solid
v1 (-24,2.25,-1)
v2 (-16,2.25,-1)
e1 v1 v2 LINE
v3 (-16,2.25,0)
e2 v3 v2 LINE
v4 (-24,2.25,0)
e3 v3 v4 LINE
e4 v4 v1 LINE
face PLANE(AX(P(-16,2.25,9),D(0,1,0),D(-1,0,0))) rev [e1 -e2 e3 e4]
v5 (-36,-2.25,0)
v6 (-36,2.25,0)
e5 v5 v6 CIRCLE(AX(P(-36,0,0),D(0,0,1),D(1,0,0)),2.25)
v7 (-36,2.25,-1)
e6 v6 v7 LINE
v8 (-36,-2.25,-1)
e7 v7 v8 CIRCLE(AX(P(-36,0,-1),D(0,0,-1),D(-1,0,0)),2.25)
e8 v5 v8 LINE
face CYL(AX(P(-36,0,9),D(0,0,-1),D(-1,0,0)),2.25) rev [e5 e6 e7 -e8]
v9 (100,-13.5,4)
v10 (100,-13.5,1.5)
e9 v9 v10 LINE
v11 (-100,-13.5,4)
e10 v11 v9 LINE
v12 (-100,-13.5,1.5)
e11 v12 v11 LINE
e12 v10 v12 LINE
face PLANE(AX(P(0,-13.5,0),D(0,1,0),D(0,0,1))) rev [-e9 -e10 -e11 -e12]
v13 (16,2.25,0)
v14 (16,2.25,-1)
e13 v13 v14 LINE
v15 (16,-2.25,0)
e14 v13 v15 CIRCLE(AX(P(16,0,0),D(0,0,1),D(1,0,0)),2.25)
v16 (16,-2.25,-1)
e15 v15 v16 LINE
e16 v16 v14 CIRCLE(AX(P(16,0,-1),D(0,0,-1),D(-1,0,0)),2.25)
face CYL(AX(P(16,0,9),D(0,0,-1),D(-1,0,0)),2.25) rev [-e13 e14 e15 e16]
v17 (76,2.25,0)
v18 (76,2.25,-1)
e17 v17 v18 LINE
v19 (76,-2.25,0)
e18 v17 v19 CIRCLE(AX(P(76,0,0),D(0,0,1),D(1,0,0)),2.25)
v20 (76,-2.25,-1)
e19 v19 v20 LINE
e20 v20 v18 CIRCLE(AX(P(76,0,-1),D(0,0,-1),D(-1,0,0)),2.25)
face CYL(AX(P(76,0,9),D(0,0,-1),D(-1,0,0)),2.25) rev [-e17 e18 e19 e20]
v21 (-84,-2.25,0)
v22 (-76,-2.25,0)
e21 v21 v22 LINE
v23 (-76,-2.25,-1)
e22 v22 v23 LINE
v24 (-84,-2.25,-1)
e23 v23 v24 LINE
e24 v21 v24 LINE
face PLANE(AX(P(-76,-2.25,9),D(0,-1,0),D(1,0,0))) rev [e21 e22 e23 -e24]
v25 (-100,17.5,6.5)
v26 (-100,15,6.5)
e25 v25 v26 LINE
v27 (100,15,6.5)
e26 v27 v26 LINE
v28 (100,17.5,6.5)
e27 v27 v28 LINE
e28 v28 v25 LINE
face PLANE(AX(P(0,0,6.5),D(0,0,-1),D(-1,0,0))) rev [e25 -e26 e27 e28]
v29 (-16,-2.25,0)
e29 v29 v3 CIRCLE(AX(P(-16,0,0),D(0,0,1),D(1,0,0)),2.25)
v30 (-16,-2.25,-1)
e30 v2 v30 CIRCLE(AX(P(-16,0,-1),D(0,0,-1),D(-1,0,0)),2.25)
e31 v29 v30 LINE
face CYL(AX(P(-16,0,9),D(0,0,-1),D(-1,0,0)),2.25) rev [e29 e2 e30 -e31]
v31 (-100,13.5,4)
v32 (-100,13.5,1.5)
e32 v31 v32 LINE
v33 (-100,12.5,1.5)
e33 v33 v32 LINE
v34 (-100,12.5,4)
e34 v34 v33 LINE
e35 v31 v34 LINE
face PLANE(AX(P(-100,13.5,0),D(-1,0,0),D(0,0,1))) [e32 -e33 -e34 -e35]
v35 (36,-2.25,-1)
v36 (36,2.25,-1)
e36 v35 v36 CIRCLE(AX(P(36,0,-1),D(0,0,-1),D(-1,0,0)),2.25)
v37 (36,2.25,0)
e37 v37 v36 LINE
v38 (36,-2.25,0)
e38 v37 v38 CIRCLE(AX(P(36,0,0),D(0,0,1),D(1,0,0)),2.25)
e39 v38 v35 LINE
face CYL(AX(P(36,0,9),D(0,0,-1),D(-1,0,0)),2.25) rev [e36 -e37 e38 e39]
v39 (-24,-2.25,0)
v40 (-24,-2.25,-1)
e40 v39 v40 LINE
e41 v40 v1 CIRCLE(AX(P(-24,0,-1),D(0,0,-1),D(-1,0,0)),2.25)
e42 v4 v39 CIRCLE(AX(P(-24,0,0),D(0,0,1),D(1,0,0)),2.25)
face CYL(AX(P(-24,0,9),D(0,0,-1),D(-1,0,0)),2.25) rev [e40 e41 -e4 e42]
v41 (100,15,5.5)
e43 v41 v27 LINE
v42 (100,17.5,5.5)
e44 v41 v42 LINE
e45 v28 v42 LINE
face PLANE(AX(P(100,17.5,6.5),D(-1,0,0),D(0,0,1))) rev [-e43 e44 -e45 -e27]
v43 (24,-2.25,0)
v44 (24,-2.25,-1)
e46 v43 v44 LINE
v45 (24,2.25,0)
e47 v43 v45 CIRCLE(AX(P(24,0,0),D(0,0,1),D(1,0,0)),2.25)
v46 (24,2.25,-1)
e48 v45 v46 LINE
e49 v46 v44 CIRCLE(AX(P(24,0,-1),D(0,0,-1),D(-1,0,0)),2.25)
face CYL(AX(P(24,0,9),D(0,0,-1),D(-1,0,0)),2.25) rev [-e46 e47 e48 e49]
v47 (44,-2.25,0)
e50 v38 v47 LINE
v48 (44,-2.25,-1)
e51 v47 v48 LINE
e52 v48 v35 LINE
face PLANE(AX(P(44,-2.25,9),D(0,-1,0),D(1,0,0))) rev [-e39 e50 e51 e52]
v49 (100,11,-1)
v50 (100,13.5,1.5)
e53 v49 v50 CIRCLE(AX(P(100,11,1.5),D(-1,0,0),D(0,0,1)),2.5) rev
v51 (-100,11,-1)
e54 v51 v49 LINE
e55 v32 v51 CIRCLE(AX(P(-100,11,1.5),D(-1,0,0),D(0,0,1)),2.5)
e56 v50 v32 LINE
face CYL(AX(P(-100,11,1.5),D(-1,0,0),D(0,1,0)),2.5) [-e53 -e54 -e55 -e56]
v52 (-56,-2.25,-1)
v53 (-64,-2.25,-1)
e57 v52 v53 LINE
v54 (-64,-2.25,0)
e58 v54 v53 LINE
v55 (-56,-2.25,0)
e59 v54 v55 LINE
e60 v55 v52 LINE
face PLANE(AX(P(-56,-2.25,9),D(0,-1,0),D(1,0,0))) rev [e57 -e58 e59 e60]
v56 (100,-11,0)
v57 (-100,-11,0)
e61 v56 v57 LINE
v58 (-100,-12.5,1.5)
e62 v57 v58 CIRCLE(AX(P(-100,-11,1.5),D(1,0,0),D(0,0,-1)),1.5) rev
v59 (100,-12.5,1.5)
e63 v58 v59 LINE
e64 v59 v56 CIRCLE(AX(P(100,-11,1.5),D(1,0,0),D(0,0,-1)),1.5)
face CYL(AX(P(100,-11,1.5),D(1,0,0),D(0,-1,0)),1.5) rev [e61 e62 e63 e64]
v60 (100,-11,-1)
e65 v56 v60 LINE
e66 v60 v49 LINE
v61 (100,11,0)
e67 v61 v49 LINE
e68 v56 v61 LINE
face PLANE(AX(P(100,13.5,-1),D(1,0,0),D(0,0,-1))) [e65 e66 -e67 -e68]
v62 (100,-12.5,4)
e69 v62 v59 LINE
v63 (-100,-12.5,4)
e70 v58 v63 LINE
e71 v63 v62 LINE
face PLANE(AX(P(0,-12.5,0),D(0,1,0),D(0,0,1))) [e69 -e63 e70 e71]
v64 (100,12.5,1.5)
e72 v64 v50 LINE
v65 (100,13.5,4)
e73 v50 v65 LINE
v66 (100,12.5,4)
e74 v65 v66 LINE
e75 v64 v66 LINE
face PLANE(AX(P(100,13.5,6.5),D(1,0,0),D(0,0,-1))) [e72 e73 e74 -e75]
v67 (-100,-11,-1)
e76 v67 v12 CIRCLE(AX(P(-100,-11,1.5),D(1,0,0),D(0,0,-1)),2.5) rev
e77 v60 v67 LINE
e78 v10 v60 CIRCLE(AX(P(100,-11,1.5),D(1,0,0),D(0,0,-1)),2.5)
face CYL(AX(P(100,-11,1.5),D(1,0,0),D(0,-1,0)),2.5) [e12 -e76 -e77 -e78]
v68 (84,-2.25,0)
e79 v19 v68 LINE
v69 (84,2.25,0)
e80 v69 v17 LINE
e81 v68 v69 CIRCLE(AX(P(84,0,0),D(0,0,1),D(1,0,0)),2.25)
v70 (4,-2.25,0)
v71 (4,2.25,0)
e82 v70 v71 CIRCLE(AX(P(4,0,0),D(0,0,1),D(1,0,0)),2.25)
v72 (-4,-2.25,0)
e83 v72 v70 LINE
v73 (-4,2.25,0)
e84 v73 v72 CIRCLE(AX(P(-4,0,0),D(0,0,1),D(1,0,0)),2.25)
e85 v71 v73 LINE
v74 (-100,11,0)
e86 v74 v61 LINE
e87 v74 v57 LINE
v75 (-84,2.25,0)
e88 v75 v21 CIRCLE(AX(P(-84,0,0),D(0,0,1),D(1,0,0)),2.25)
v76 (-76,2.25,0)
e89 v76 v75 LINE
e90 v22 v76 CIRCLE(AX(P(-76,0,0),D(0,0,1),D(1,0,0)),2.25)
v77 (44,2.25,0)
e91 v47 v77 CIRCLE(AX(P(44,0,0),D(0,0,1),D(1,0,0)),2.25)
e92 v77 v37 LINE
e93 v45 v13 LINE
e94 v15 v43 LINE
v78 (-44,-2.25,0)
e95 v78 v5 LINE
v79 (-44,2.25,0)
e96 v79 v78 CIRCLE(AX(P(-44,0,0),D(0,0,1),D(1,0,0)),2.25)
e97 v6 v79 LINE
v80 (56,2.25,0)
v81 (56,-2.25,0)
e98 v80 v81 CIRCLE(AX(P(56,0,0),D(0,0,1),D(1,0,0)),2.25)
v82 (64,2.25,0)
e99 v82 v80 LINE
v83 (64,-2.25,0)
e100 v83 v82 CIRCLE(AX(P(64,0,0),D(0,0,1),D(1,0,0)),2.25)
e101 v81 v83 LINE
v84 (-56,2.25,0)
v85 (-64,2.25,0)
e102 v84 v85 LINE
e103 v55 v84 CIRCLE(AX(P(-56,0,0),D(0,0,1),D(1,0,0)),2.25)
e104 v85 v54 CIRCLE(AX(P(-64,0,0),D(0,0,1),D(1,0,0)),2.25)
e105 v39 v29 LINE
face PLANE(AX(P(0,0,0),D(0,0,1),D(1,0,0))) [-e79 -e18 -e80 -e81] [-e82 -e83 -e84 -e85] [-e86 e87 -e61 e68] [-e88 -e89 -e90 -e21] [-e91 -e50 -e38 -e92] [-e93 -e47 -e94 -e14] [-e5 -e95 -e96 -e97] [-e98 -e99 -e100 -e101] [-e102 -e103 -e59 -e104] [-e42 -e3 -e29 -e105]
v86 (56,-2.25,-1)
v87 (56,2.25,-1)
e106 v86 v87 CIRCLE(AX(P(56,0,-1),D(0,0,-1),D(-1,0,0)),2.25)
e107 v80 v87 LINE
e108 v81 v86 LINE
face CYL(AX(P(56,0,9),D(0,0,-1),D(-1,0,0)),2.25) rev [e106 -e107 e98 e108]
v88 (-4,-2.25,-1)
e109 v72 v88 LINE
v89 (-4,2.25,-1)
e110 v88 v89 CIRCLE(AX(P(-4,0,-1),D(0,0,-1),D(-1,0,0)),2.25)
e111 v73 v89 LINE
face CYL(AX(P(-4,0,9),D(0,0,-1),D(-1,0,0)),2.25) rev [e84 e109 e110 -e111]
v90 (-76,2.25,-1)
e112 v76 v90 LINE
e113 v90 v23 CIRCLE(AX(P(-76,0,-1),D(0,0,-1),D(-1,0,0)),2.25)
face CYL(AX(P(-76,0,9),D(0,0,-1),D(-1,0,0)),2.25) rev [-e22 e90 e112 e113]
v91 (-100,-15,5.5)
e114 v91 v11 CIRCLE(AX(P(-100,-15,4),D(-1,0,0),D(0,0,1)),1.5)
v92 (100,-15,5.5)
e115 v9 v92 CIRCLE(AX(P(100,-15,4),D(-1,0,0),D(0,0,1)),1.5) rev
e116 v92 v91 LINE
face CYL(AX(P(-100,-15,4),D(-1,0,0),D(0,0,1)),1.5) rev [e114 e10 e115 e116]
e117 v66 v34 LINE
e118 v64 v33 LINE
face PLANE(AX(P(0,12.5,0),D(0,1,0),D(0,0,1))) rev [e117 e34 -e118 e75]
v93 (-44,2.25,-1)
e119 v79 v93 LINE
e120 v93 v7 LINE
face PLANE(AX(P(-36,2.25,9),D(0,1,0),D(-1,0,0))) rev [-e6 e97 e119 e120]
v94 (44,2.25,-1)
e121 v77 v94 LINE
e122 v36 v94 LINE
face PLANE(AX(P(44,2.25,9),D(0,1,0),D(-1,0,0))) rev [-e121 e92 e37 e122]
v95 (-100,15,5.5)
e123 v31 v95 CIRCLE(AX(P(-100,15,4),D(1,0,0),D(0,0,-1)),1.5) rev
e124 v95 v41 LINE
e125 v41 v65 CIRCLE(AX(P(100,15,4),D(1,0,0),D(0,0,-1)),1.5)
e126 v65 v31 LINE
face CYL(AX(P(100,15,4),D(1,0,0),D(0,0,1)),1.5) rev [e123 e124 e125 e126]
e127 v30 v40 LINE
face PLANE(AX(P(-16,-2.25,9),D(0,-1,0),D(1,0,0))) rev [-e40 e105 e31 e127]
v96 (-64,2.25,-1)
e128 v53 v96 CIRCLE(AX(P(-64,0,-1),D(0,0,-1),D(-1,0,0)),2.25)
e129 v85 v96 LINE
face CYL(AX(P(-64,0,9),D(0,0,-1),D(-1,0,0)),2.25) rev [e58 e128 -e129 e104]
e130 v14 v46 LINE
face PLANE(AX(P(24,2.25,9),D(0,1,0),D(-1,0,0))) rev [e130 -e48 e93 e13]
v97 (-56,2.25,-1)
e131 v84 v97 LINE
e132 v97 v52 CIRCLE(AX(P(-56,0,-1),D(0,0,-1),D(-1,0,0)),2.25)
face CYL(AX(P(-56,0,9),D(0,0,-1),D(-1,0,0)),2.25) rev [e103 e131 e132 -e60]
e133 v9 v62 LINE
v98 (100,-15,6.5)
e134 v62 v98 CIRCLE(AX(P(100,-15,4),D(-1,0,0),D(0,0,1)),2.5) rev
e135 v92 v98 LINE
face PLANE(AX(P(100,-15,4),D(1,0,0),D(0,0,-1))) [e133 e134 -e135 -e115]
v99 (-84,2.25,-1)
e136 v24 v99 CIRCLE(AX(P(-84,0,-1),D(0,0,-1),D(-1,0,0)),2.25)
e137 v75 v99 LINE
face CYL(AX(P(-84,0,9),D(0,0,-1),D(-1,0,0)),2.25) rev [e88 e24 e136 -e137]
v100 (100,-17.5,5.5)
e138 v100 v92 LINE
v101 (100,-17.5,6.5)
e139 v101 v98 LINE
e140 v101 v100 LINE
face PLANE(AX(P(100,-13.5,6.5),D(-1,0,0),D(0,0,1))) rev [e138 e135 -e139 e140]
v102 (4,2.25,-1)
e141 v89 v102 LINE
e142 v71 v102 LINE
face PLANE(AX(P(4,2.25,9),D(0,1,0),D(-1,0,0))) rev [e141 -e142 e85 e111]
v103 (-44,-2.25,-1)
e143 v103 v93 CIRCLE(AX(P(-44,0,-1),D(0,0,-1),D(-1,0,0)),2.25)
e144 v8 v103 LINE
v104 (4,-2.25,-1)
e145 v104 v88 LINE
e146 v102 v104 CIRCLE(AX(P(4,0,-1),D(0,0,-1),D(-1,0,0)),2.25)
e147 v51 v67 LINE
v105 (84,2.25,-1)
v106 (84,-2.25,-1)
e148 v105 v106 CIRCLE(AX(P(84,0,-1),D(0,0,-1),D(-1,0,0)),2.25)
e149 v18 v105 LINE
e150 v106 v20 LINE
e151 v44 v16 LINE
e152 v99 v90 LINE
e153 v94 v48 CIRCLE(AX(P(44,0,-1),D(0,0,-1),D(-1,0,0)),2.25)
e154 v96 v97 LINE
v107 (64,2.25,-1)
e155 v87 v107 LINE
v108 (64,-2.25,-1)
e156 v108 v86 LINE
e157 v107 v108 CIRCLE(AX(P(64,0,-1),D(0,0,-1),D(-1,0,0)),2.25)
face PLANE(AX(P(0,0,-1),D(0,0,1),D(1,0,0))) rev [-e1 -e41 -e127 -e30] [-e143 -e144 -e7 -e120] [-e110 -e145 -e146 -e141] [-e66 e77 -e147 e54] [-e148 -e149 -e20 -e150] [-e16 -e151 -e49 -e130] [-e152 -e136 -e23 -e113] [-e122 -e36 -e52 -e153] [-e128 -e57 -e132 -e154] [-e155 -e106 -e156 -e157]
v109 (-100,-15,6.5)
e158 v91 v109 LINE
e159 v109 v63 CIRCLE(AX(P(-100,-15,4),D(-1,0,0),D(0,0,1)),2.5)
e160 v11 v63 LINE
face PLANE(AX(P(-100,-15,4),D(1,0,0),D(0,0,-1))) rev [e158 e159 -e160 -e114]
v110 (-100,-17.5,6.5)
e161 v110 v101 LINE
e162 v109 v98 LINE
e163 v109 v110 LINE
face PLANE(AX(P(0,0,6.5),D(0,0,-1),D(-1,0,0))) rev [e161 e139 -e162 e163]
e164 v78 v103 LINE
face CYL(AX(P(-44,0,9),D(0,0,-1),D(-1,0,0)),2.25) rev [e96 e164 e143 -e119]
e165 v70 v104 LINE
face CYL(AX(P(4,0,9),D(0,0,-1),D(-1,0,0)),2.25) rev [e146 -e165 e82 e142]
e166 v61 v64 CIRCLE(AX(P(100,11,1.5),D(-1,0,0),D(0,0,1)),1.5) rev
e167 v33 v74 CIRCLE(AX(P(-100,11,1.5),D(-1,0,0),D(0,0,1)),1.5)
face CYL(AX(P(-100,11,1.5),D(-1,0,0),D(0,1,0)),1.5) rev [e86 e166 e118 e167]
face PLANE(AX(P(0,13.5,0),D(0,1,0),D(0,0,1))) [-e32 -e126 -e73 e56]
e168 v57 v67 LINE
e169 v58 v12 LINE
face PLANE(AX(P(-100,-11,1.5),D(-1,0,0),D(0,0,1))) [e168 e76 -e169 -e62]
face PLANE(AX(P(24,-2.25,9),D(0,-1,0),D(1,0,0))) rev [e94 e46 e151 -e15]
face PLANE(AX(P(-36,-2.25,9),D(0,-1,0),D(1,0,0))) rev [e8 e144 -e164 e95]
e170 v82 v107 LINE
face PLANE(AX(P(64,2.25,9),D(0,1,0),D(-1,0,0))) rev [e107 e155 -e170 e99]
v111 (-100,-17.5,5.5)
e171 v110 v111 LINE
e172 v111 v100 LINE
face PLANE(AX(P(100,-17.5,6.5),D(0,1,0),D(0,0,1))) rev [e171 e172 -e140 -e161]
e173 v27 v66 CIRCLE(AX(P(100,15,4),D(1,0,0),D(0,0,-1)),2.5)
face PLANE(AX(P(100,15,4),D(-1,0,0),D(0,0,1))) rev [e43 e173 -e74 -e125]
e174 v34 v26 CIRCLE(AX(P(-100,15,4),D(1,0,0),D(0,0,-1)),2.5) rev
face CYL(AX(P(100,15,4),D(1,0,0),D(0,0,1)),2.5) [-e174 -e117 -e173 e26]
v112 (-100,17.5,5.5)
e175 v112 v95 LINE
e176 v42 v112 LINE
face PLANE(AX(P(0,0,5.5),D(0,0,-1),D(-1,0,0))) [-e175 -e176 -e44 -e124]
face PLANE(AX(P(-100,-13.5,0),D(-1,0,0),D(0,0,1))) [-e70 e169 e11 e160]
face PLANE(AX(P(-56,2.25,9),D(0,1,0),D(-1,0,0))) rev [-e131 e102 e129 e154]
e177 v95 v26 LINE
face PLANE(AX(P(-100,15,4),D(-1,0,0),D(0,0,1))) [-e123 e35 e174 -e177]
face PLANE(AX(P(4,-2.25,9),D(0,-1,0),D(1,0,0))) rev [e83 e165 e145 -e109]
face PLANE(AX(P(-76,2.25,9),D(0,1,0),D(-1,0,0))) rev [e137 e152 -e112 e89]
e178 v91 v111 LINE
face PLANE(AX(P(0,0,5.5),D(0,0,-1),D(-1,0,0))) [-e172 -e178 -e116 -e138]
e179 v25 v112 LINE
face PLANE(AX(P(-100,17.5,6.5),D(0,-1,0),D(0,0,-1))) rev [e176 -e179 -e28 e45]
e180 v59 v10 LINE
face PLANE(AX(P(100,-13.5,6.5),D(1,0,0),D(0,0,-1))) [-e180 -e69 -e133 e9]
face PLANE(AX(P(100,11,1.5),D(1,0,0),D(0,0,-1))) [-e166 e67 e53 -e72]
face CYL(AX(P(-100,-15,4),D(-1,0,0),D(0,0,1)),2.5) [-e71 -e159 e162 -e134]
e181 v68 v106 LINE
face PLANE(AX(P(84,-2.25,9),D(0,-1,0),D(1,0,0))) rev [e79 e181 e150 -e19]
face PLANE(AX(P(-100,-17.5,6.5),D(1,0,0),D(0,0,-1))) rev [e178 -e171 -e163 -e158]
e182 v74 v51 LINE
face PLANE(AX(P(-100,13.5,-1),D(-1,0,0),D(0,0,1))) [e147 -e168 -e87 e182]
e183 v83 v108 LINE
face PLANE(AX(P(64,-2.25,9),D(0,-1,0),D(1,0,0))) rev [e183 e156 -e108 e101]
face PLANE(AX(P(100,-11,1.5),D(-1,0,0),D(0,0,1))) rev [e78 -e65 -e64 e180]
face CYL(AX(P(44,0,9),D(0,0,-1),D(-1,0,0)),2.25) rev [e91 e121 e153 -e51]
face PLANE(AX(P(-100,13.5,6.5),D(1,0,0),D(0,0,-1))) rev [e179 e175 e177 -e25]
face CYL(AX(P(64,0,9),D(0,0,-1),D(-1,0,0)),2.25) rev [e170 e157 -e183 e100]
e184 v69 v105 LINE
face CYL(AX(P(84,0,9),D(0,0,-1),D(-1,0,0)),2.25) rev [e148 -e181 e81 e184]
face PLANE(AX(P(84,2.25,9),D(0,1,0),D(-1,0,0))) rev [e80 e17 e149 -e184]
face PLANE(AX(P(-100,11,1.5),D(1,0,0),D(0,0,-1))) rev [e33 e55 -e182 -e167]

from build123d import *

# Parameters (mm, degrees)
SKETCH_1_W                         = 200
SKETCH_1_H                         = 27
SM_BASE_FLANGE_1_DEPTH             = 1
SM_EDGE_FLANGE_1_STRIP_W           = 7
SM_EDGE_FLANGE_1_STRIP_H           = 1
SM_EDGE_FLANGE_1_STRIP_CUT_DEPTH   = 200
SM_EDGE_FLANGE_1_STRIP_2_W         = 7
SM_EDGE_FLANGE_1_STRIP_2_H         = 1
SM_EDGE_FLANGE_1_STRIP_CUT_2_DEPTH = 200
SM_EDGE_FLANGE_1_DEPTH             = 200
SM_EDGE_FLANGE_1_BEND_DEPTH        = 200
SM_EDGE_FLANGE_2_STRIP_W           = 7
SM_EDGE_FLANGE_2_STRIP_H           = 1
SM_EDGE_FLANGE_2_STRIP_CUT_DEPTH   = 200
SM_EDGE_FLANGE_2_STRIP_2_W         = 7
SM_EDGE_FLANGE_2_STRIP_2_H         = 1
SM_EDGE_FLANGE_2_STRIP_CUT_2_DEPTH = 200
SM_EDGE_FLANGE_2_DEPTH             = 200
SM_EDGE_FLANGE_2_BEND_DEPTH        = 200
CUT_EXTRUDE_1_DEPTH                = 10
PATTERN_LINEAR_1_COUNT             = 5
PATTERN_LINEAR_1_PITCH             = 20
PATTERN_LINEAR_1_COL_COUNT         = 5
PATTERN_LINEAR_1_COL_PITCH         = 20


# Sheet-metal steps are written as plain solids
with BuildPart() as part:
    # Sketch 1 → 基体-法兰1 (new body)
    with BuildSketch(Plane.XY):
        Rectangle(SKETCH_1_W, SKETCH_1_H)
    extrude(amount=-SM_BASE_FLANGE_1_DEPTH)

    # 边线-法兰1 strip (across the edge) → 边线-法兰1 strip cut (cut)
    with BuildSketch(Plane(origin=(100, 13.5, 0), x_dir=(0, -1, 0), z_dir=(-1, 0, 0))):
        with Locations((-1, -0.5)):
            Rectangle(SM_EDGE_FLANGE_1_STRIP_W, SM_EDGE_FLANGE_1_STRIP_H)
    extrude(amount=SM_EDGE_FLANGE_1_STRIP_CUT_DEPTH, mode=Mode.SUBTRACT)

    # 边线-法兰1 strip 2 (across the edge) → 边线-法兰1 strip cut 2 (cut)
    with BuildSketch(Plane(origin=(-100, -13.5, 0), x_dir=(0, 1, 0), z_dir=(1, 0, 0))):
        with Locations((-1, -0.5)):
            Rectangle(SM_EDGE_FLANGE_1_STRIP_2_W, SM_EDGE_FLANGE_1_STRIP_2_H)
    extrude(amount=SM_EDGE_FLANGE_1_STRIP_CUT_2_DEPTH, mode=Mode.SUBTRACT)

    # 边线-法兰1 section (across the edge) → 边线-法兰1 (add)
    with BuildSketch(Plane(origin=(100, 13.5, 0), x_dir=(0, -1, 0), z_dir=(-1, 0, 0))):
        with BuildLine():
            Line((0, 1.5), (0, 6.5))
            Line((0, 6.5), (1, 6.5))
            Line((1, 6.5), (1, 1.5))
            ThreePointArc((1, 1.5), (1.439339828, 0.439339828), (2.5, 0))
            Line((2.5, 0), (2.5, -1))
            ThreePointArc((2.5, -1), (0.732233047, -0.267766953), (0, 1.5))
        make_face()
    extrude(amount=SM_EDGE_FLANGE_1_DEPTH)

    # 边线-法兰1 section 2 (across the edge) → 边线-法兰1 bend (add)
    with BuildSketch(Plane(origin=(-100, -13.5, 0), x_dir=(0, 1, 0), z_dir=(1, 0, 0))):
        with BuildLine():
            Line((0, 1.5), (0, 6.5))
            Line((0, 6.5), (1, 6.5))
            Line((1, 6.5), (1, 1.5))
            ThreePointArc((1, 1.5), (1.439339828, 0.439339828), (2.5, 0))
            Line((2.5, 0), (2.5, -1))
            ThreePointArc((2.5, -1), (0.732233047, -0.267766953), (0, 1.5))
        make_face()
    extrude(amount=SM_EDGE_FLANGE_1_BEND_DEPTH)

    # 边线-法兰2 strip (across the edge) → 边线-法兰2 strip cut (cut)
    with BuildSketch(Plane(origin=(-100, 13.5, 6.5), x_dir=(0, 0, -1), z_dir=(1, 0, 0))):
        with Locations((-1, -0.5)):
            Rectangle(SM_EDGE_FLANGE_2_STRIP_W, SM_EDGE_FLANGE_2_STRIP_H)
    extrude(amount=SM_EDGE_FLANGE_2_STRIP_CUT_DEPTH, mode=Mode.SUBTRACT)

    # 边线-法兰2 strip 2 (across the edge) → 边线-法兰2 strip cut 2 (cut)
    with BuildSketch(Plane(origin=(100, -13.5, 6.5), x_dir=(0, 0, -1), z_dir=(-1, 0, 0))):
        with Locations((-1, -0.5)):
            Rectangle(SM_EDGE_FLANGE_2_STRIP_2_W, SM_EDGE_FLANGE_2_STRIP_2_H)
    extrude(amount=SM_EDGE_FLANGE_2_STRIP_CUT_2_DEPTH, mode=Mode.SUBTRACT)

    # 边线-法兰2 section (across the edge) → 边线-法兰2 (add)
    with BuildSketch(Plane(origin=(-100, 13.5, 6.5), x_dir=(0, 0, -1), z_dir=(1, 0, 0))):
        with BuildLine():
            Line((0, 1.5), (0, 4))
            Line((0, 4), (1, 4))
            Line((1, 4), (1, 1.5))
            ThreePointArc((1, 1.5), (1.439339828, 0.439339828), (2.5, 0))
            Line((2.5, 0), (2.5, -1))
            ThreePointArc((2.5, -1), (0.732233047, -0.267766953), (0, 1.5))
        make_face()
    extrude(amount=SM_EDGE_FLANGE_2_DEPTH)

    # 边线-法兰2 section 2 (across the edge) → 边线-法兰2 bend (add)
    with BuildSketch(Plane(origin=(100, -13.5, 6.5), x_dir=(0, 0, -1), z_dir=(-1, 0, 0))):
        with BuildLine():
            Line((0, 1.5), (0, 4))
            Line((0, 4), (1, 4))
            Line((1, 4), (1, 1.5))
            ThreePointArc((1, 1.5), (1.439339828, 0.439339828), (2.5, 0))
            Line((2.5, 0), (2.5, -1))
            ThreePointArc((2.5, -1), (0.732233047, -0.267766953), (0, 1.5))
        make_face()
    extrude(amount=SM_EDGE_FLANGE_2_BEND_DEPTH)

    # 草图18 → 切除-拉伸1 (cut)
    with BuildSketch(Plane(origin=(0, 0, -1), x_dir=(-1, 0, 0), z_dir=(0, 0, -1))):
        with BuildLine():
            Line((-4, 2.25), (4, 2.25))
            ThreePointArc((4, 2.25), (6.25, 0), (4, -2.25))
            Line((4, -2.25), (-4, -2.25))
            ThreePointArc((-4, -2.25), (-6.25, 0), (-4, 2.25))
        make_face()
    cut_extrude_1 = extrude(amount=-CUT_EXTRUDE_1_DEPTH, mode=Mode.SUBTRACT)

    # 阵列(线性)1: 切除-拉伸1 ×5
    with Locations(*[(i * PATTERN_LINEAR_1_PITCH, 0, 0) for i in range(1, PATTERN_LINEAR_1_COUNT)]):
        add(cut_extrude_1, mode=Mode.SUBTRACT)

    # 阵列(线性)1 col: 切除-拉伸1 ×5
    with Locations(*[(-i * PATTERN_LINEAR_1_COL_PITCH, 0, 0) for i in range(1, PATTERN_LINEAR_1_COL_COUNT)]):
        add(cut_extrude_1, mode=Mode.SUBTRACT)


solid = part.part
